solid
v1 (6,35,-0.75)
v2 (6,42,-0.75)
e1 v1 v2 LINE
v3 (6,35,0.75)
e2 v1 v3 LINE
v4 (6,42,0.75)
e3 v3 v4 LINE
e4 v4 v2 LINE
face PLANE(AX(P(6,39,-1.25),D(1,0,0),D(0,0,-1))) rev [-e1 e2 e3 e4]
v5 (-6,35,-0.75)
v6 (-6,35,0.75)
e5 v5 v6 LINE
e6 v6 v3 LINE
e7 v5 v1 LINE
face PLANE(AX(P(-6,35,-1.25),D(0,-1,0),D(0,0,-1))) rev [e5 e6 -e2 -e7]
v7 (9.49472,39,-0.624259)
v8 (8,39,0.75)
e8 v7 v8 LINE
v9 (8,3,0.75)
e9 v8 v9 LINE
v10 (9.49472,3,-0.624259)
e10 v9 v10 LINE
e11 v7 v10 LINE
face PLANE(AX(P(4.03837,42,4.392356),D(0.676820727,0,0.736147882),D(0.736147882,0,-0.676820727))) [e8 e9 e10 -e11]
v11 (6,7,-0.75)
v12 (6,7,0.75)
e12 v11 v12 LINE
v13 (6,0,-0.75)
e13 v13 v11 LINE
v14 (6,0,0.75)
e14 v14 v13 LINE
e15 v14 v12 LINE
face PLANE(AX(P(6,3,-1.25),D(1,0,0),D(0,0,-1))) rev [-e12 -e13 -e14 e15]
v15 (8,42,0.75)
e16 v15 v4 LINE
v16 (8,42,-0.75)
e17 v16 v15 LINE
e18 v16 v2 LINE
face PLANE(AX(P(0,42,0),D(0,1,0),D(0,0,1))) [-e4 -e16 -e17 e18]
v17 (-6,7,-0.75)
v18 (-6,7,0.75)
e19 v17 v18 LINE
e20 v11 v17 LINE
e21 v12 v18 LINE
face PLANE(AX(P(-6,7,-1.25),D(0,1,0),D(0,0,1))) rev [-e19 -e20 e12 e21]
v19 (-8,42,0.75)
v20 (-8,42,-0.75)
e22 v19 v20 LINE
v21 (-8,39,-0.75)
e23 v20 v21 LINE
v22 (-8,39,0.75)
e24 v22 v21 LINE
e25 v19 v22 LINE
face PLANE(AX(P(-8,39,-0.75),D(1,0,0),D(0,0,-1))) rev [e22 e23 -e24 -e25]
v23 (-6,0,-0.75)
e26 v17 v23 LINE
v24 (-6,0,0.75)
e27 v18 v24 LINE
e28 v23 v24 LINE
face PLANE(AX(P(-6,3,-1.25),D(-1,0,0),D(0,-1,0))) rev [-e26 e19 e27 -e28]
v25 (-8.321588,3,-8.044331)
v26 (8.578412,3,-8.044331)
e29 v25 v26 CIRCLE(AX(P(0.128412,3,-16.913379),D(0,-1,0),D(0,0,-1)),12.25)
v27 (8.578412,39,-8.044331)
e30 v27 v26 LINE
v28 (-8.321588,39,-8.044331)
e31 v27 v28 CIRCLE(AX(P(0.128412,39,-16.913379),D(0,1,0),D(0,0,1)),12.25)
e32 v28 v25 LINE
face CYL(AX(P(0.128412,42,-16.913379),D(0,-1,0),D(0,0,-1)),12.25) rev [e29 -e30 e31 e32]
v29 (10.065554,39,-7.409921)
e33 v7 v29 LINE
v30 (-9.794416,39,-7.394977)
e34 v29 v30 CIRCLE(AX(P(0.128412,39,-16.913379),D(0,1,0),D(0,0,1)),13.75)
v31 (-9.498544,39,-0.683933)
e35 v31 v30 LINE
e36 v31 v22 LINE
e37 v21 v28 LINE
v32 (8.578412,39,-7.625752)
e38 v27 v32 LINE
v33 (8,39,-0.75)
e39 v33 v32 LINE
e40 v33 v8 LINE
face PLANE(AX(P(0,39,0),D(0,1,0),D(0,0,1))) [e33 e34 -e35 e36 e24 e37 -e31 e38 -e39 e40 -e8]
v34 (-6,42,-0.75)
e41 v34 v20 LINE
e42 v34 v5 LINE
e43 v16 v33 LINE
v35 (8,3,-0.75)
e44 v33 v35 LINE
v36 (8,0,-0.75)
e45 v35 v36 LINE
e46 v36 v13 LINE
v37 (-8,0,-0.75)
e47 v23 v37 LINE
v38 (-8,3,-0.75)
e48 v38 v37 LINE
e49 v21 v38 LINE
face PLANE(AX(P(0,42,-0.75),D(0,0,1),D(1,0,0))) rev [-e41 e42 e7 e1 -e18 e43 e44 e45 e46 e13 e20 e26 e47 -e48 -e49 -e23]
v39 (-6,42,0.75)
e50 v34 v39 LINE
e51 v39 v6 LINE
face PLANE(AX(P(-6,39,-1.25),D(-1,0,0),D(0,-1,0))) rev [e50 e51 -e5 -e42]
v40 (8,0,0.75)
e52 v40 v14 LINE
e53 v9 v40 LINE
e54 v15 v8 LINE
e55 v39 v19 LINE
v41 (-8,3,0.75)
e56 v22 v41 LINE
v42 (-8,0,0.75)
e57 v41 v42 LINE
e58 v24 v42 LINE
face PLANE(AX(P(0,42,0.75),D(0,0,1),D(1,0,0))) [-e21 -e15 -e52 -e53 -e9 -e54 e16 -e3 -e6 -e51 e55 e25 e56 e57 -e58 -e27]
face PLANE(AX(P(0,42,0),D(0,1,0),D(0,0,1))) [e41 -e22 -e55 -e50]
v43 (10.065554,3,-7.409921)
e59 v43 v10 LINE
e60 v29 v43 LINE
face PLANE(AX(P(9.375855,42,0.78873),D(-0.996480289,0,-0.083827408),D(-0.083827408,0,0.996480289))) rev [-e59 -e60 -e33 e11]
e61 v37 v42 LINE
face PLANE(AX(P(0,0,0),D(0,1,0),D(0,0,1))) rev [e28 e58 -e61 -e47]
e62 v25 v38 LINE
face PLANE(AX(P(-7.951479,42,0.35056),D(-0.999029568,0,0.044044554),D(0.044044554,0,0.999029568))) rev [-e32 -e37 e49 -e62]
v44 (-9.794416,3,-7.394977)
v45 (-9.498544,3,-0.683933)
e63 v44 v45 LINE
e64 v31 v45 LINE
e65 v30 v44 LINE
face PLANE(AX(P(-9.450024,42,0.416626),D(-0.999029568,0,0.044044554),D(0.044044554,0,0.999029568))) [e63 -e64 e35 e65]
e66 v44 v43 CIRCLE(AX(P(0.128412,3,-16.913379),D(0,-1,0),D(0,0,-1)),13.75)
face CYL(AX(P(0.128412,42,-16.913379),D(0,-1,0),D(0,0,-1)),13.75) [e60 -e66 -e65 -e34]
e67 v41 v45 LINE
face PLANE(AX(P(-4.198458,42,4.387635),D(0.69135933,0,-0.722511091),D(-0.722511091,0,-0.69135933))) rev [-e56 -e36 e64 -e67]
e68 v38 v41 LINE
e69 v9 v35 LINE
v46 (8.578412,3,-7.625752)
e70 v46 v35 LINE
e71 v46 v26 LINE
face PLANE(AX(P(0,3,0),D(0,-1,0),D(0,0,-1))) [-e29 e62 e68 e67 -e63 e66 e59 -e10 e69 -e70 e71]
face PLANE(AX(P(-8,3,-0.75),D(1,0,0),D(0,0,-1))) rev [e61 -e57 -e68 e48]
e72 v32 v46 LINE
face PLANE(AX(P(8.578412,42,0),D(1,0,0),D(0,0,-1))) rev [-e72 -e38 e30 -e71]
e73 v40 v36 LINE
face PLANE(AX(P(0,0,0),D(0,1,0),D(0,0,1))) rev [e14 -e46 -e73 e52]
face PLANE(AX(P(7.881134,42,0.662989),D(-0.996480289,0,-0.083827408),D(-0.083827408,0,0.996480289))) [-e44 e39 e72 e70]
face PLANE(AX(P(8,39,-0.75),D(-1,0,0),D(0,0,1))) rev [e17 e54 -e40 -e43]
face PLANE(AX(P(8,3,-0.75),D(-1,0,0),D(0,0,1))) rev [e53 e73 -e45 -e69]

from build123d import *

# Parameters (mm, degrees)
EXTRUDE_1_DEPTH     = 42
CUT_EXTRUDE_START   = -3
CUT_EXTRUDE_3_DEPTH = 3
CUT_EXTRUDE_4_DEPTH = 3
CUT_EXTRUDE_5_DEPTH = 2


# Read off the part's stored shape, not the designer's step: Вырез-Вытянуть3
with BuildPart() as part:
    # Эскиз1 → Бобышка-Вытянуть1 (new body)
    with BuildSketch(Plane(origin=(0, 0, 0), x_dir=(1, 0, 0), z_dir=(0, 1, 0))):
        with BuildLine():
            Line((-8, -0.75), (8, -0.75))
            Line((8, -0.75), (9.494720433, 0.624258888))
            Line((9.494720433, 0.624258888), (10.065554034, 7.409920575))
            ThreePointArc((10.065554034, 7.409920575), (11.957363782, 9.903499319), (13.236218518, 12.760317415))
            ThreePointArc((13.236218518, 12.760317415), (13.878412353, 16.91337864), (13.236218518, 21.066439864))
            ThreePointArc((13.236218518, 21.066439864), (0.128412353, 30.66337864), (-12.979393813, 21.066439864))
            ThreePointArc((-12.979393813, 21.066439864), (-13.621587647, 16.91337864), (-12.979393813, 12.760317415))
            ThreePointArc((-12.979393813, 12.760317415), (-11.695261173, 9.894600658), (-9.794416407, 7.394977019))
            Line((-9.794416407, 7.394977019), (-9.498544352, 0.683933169))
            Line((-9.498544352, 0.683933169), (-8, -0.75))
        make_face()
        with BuildLine():
            Line((8.578412353, 7.625752463), (8, 0.75))
            Line((8, 0.75), (-8, 0.75))
            Line((-8, 0.75), (-8.321587647, 8.04433134))
            ThreePointArc((-8.321587647, 8.04433134), (-10.262087468, 10.424926322), (-11.549451322, 13.21337864))
            ThreePointArc((-11.549451322, 13.21337864), (-12.121587647, 16.91337864), (-11.549451322, 20.61337864))
            ThreePointArc((-11.549451322, 20.61337864), (0.128412353, 29.16337864), (11.806276027, 20.61337864))
            ThreePointArc((11.806276027, 20.61337864), (12.378412353, 16.91337864), (11.806276027, 13.21337864))
            ThreePointArc((11.806276027, 13.21337864), (10.518912173, 10.424926322), (8.578412353, 8.04433134))
            Line((8.578412353, 8.04433134), (8.578412353, 7.625752463))
        make_face(mode=Mode.SUBTRACT)
    extrude(amount=EXTRUDE_1_DEPTH)

    # Вырез-Вытянуть3 outline → Вырез-Вытянуть3 (cut)
    with BuildSketch(Plane(origin=(0, 42, 0), x_dir=(1, 0, 0), z_dir=(0, 1, 0)).offset(CUT_EXTRUDE_START)):
        with BuildLine():
            Line((-9.498544352, 0.683933169), (-8, -0.75))
            Line((-8, -0.75), (-8, 0.75))
            Line((-8, 0.75), (-8.321587647, 8.04433134))
            ThreePointArc((-8.321587647, 8.04433134), (0.128412353, 29.16337864), (8.578412353, 8.04433134))
            Line((8.578412353, 8.04433134), (8.578412353, 7.625752463))
            Line((8.578412353, 7.625752463), (8, 0.75))
            Line((8, 0.75), (8, -0.75))
            Line((8, -0.75), (9.494720433, 0.624258888))
            Line((9.494720433, 0.624258888), (10.065554034, 7.409920575))
            ThreePointArc((10.065554034, 7.409920575), (0.118066222, 30.663374747), (-9.794416407, 7.394977019))
            Line((-9.794416407, 7.394977019), (-9.498544352, 0.683933169))
        make_face()
    extrude(amount=CUT_EXTRUDE_3_DEPTH, mode=Mode.SUBTRACT)

    # Эскиз5 → Вырез-Вытянуть4 (cut)
    with BuildSketch(Plane.XZ):
        Polygon((-15.223121419, -31.649837006), (15.223121419, -31.649837006), (15.223121419, -0.75), (15.223121419, 0.75), (8, 0.75), (8, -0.75), (-8, -0.75), (-8, 0.75), (-15.223121419, 0.75), (-15.223121419, -0.75), align=None)
    extrude(amount=-CUT_EXTRUDE_4_DEPTH, mode=Mode.SUBTRACT)

    # Эскиз2 → Вырез-Вытянуть5 (cut)
    with BuildSketch(Plane.XY.offset(0.75)):
        Polygon((-6, 3), (-6, 0), (6, 0), (6, 3), (6, 7), (-6, 7), align=None)
        Polygon((-6, 39), (-6, 35), (6, 35), (6, 39), (6, 42), (-6, 42), align=None)
    extrude(amount=-CUT_EXTRUDE_5_DEPTH, mode=Mode.SUBTRACT)


solid = part.part
